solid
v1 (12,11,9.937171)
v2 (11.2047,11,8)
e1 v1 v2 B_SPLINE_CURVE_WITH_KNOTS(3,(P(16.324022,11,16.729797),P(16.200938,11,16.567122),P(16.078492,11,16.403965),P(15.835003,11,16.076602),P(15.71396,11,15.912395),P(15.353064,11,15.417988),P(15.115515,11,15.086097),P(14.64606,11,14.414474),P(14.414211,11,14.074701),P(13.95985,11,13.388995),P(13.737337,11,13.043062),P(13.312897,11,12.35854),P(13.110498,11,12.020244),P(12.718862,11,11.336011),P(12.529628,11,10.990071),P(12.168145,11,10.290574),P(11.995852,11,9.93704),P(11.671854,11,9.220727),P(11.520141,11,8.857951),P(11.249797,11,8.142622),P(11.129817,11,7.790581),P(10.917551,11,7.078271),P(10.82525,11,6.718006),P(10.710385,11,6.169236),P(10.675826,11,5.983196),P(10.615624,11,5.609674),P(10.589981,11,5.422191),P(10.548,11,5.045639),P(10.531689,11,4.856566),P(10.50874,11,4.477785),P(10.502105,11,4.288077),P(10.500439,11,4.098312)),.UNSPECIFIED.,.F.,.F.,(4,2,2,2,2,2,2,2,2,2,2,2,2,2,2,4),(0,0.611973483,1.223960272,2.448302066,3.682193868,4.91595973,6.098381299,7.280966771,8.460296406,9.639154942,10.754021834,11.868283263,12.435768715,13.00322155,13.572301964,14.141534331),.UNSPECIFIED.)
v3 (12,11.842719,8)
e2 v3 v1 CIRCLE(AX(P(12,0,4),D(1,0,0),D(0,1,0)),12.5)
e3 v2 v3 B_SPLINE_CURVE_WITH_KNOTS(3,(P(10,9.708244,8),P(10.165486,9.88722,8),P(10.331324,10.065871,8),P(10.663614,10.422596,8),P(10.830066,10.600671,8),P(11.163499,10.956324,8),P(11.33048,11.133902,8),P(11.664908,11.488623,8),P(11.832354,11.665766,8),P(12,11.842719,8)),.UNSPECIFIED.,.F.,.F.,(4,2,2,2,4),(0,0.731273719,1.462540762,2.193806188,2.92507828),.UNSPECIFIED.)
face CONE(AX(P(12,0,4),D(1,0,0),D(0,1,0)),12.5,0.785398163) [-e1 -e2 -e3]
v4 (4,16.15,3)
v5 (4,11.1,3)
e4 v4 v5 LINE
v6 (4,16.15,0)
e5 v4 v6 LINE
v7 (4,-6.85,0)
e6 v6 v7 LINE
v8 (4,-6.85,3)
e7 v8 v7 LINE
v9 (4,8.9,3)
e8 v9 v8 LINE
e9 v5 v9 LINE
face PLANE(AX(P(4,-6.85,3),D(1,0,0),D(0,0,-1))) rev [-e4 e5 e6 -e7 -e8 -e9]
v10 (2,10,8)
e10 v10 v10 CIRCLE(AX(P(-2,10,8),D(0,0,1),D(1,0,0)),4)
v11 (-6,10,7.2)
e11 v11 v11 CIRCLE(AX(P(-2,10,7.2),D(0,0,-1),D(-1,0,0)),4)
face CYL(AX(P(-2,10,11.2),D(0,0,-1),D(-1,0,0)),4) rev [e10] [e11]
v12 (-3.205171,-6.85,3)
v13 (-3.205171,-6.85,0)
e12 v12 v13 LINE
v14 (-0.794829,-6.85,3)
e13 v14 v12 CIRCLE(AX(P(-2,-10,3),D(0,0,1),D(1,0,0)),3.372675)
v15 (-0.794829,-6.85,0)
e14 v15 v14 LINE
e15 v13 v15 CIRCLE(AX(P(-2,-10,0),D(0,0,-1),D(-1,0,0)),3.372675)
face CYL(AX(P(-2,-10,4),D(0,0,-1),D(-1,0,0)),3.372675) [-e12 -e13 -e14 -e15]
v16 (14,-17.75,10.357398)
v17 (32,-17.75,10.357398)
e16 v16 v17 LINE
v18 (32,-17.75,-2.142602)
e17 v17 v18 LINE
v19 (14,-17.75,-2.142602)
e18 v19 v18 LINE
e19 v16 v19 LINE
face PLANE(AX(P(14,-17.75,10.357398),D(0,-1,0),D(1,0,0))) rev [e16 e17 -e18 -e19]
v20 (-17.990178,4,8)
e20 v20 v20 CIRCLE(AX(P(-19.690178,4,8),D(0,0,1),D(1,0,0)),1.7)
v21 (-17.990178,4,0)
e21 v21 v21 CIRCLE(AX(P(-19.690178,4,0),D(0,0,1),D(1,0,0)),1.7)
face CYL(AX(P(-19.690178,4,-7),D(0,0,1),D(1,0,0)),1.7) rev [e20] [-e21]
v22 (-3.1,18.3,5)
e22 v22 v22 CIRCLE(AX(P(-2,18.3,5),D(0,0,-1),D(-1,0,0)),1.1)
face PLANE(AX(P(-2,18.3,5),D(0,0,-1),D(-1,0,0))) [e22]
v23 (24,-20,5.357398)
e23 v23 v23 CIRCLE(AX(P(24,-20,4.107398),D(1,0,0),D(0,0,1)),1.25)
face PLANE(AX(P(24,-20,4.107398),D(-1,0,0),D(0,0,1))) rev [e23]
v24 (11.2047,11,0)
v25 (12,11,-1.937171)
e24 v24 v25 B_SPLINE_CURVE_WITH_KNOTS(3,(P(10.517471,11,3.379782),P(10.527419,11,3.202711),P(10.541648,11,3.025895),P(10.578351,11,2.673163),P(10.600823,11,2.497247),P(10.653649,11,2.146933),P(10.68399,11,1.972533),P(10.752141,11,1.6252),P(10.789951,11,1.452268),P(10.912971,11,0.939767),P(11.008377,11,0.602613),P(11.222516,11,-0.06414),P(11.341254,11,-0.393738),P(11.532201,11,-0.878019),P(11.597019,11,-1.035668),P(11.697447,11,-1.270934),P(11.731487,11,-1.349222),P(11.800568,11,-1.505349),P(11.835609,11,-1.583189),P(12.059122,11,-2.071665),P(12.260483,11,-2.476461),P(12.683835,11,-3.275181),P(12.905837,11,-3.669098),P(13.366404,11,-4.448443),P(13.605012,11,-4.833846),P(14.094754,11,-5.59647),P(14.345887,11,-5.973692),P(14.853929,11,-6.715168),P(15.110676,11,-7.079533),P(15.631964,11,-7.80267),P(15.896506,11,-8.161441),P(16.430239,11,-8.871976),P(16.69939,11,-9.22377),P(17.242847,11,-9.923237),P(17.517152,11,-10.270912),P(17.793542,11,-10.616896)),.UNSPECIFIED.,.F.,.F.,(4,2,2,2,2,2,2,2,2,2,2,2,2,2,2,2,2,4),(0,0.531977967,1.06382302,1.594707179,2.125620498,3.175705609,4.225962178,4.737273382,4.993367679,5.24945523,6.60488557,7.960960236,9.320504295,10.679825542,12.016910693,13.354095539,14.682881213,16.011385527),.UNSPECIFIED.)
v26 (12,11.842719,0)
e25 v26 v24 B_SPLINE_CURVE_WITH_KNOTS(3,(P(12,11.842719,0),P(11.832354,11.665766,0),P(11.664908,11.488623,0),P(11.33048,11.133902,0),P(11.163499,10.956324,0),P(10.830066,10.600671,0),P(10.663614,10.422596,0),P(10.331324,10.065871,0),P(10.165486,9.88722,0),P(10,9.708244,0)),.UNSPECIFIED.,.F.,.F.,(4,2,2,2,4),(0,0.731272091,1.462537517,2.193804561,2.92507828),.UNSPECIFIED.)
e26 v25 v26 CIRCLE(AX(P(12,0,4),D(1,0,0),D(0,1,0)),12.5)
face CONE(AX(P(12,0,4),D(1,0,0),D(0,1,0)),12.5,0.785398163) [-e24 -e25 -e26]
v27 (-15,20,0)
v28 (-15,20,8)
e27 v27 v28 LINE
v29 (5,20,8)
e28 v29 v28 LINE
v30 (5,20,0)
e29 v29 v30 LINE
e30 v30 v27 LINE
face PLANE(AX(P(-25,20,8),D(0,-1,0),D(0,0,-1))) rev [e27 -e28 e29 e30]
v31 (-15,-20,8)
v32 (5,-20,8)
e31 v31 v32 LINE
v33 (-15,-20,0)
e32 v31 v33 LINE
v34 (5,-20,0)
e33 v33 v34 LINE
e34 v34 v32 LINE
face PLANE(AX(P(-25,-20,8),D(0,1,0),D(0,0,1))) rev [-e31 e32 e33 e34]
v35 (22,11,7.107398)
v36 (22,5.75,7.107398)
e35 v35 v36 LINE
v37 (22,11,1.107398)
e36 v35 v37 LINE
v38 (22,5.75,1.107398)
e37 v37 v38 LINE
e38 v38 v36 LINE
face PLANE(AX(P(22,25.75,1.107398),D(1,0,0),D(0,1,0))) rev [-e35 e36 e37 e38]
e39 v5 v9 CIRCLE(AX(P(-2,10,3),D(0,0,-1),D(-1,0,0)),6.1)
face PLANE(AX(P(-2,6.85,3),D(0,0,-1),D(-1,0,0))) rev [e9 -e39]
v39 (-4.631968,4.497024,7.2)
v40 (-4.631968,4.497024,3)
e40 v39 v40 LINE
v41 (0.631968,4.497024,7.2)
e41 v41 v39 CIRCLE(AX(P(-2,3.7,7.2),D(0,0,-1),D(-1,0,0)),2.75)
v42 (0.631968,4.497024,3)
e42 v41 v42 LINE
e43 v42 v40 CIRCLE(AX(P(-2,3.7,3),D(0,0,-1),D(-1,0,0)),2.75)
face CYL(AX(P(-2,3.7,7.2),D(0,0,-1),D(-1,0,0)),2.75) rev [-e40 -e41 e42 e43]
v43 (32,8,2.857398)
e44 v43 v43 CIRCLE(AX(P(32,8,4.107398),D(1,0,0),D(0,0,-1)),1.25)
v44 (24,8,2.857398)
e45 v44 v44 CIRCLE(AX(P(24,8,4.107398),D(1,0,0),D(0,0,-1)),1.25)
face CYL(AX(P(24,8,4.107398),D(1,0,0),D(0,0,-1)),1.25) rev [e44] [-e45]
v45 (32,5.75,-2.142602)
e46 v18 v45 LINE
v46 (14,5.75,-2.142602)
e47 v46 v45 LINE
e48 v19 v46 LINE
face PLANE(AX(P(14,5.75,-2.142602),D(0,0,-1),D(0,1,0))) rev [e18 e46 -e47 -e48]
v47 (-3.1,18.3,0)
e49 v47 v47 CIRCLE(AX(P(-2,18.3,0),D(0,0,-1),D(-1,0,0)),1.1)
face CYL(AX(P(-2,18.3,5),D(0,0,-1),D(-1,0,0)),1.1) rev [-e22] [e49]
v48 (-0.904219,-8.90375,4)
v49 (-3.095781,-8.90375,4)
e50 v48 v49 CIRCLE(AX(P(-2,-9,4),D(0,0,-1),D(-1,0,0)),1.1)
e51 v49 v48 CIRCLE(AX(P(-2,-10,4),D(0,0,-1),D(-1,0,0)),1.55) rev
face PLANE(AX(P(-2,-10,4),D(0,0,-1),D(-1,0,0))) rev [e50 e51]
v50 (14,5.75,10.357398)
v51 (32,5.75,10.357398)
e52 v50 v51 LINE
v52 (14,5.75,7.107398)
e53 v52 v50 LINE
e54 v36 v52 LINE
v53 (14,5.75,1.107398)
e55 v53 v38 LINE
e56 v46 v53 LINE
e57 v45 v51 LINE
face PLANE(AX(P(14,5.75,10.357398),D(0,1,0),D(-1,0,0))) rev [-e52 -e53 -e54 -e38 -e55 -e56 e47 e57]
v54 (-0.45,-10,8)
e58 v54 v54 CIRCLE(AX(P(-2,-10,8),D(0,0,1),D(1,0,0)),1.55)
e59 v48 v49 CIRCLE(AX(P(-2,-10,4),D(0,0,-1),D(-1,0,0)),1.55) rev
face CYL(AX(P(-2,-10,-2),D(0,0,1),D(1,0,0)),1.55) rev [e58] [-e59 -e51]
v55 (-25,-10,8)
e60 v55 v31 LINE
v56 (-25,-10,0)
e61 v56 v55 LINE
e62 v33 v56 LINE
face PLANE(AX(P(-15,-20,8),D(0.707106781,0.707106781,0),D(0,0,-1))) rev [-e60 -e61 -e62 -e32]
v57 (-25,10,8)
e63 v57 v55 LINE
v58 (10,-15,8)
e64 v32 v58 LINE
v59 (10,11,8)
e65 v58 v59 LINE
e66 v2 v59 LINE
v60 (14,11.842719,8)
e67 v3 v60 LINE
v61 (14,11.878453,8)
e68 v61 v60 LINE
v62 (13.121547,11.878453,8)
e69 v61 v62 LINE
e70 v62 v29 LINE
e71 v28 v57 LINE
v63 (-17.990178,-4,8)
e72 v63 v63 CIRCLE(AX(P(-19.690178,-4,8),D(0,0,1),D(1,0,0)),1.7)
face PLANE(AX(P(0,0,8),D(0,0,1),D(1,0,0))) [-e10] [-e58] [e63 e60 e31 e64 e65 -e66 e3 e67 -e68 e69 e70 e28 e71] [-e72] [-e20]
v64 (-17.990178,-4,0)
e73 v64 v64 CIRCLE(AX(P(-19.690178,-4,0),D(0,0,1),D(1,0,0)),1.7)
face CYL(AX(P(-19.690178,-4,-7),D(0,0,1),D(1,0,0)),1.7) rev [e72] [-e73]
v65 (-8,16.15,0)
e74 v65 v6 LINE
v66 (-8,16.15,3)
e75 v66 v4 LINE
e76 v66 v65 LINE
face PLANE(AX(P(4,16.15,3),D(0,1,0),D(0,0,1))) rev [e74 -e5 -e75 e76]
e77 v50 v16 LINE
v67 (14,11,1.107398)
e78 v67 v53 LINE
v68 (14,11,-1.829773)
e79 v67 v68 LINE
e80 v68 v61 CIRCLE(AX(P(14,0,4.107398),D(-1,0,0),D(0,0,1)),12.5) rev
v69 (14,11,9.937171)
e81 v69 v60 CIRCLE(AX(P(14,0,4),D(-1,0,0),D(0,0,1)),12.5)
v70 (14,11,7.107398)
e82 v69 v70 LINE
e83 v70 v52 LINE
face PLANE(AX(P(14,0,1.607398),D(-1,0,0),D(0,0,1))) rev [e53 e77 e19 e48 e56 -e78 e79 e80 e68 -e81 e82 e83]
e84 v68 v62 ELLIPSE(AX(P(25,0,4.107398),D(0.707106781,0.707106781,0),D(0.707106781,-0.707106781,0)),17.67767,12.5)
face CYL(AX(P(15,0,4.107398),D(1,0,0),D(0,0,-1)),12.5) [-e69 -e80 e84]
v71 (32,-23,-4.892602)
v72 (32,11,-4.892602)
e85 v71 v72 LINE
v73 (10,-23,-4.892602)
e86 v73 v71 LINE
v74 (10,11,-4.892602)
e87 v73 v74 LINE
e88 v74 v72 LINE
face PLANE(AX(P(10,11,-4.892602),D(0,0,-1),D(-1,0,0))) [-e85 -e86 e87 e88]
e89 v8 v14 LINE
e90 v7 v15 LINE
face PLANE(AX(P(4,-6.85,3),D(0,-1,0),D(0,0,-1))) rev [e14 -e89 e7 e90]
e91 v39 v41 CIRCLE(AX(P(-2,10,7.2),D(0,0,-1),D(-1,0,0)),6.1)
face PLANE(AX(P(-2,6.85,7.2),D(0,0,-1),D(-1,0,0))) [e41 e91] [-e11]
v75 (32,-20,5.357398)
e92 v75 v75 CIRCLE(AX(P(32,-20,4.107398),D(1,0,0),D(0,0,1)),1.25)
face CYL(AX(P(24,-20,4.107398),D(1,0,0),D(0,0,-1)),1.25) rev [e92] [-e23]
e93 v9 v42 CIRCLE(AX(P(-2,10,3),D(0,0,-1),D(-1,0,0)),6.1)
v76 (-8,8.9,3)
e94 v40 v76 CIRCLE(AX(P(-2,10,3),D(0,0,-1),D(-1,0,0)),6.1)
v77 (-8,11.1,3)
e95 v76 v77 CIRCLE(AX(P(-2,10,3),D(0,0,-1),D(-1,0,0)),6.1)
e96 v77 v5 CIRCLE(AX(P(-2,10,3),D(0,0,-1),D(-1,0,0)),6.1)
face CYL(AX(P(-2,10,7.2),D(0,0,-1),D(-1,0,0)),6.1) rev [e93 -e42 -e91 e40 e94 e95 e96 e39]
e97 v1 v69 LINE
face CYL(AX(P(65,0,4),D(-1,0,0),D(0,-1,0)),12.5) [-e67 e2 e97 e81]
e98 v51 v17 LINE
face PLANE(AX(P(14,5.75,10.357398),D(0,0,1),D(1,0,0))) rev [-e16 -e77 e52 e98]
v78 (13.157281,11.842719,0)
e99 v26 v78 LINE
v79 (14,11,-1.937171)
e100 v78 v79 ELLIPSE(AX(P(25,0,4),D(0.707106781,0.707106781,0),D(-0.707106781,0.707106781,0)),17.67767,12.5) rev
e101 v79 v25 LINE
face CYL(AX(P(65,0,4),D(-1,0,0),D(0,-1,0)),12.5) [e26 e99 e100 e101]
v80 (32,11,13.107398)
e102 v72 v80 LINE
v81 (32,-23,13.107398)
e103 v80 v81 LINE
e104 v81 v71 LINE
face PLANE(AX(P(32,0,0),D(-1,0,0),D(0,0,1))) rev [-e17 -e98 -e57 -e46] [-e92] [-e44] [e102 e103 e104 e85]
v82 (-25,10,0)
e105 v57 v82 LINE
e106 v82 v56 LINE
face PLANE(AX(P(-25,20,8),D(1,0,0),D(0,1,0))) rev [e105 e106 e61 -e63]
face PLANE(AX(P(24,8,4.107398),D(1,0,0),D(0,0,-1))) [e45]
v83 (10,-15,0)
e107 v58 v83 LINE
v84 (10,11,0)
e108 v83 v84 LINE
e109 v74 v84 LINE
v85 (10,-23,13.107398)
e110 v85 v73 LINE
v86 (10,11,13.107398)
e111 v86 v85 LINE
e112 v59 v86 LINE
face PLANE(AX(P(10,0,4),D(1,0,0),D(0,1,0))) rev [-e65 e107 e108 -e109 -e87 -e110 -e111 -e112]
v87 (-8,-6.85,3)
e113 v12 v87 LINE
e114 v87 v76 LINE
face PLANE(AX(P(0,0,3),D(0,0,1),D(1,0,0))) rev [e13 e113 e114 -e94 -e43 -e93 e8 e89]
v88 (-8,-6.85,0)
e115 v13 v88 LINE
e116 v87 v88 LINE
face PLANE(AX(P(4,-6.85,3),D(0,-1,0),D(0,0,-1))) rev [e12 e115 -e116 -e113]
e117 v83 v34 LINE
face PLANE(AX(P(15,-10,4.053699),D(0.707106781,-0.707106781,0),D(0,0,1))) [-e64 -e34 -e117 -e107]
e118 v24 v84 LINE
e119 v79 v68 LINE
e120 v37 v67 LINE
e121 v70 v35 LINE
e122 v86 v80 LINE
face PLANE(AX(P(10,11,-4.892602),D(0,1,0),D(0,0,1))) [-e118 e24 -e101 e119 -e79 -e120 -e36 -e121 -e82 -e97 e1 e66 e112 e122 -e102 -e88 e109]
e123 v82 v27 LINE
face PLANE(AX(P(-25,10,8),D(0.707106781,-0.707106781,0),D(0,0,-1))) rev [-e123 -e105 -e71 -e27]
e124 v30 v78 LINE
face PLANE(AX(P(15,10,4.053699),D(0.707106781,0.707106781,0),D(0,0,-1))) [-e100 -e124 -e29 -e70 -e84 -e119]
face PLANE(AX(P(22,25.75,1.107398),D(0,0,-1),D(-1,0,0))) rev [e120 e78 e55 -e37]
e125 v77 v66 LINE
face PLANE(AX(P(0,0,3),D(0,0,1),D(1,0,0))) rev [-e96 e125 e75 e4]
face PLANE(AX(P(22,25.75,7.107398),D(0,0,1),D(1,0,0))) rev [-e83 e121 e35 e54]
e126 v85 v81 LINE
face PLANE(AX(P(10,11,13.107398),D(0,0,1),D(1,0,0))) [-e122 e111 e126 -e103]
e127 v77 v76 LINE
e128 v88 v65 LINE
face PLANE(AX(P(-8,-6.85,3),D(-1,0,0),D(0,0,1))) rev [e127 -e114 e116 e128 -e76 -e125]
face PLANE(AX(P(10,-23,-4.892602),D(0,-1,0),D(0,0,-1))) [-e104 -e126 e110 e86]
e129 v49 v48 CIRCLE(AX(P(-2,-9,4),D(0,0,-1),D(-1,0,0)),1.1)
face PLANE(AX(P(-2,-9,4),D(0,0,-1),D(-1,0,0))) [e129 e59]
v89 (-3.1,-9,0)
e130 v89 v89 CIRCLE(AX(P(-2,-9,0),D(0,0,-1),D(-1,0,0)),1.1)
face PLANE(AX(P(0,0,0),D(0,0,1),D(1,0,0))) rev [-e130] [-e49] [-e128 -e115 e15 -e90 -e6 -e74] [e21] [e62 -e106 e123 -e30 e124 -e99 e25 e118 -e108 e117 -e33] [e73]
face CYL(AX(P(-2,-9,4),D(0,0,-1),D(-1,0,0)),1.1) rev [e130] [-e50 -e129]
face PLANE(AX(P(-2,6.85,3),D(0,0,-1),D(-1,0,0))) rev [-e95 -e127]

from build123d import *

# Parameters (mm, degrees)
SKETCH_1_W                = 50
SKETCH_1_H                = 40
EXTRUDE_1_DEPTH           = 8
CHAMFER_1_SIZE            = 10
SKETCH_2_R                = 1.55
CUT_EXTRUDE_1_DEPTH       = 10
EXTRUDE_2_DEPTH           = 40
EXTRUDE_2_DEPTH_BACK      = 15
SKETCH_3_R                = 12.5
SKETCH_4_R                = 1.7
CUT_EXTRUDE_2_DEPTH       = 15
CUT_EXTRUDE_START         = -20
CUT_EXTRUDE_3_DEPTH       = 20
SKETCH_7_R                = 16.5
CUT_EXTRUDE_8_DEPTH       = 33
CUT_EXTRUDE_9_DEPTH       = 20
CHAMFER_3_SIZE            = 2
SKETCH_10_OUTSIDE_W       = 47.322
SKETCH_10_OUTSIDE_H       = 62.322
SKETCH_10_OUTSIDE_R       = 12.5
CUT_EXTRUDE_10_DEPTH      = 10
CHAMFER_4_SIZE            = 10
SKETCH_12_W               = 1.5
SKETCH_12_H               = 20
SKETCH_14_W               = 12
SKETCH_14_H               = 23
CUT_EXTRUDE_11_DEPTH      = 3
CUT_EXTRUDE_12_DEPTH      = 4.2
SKETCH_16_R               = 1.1
CUT_EXTRUDE_13_DEPTH      = 5
SKETCH_17_R               = 3.372674955
EXTRUDE_3_DEPTH           = 4
SKETCH_18_R               = 1.1
CUT_EXTRUDE_14_DEPTH      = 4
SKETCH_20_R               = 4
CUT_EXTRUDE_15_DEPTH      = 4
CUT_EXTRUDE_16_DEPTH      = 70.980354503
CUT_EXTRUDE_16_DEPTH_BACK = 70.980354503
SKETCH_21_W               = 56.3061188
SKETCH_21_H               = 46.683670243
EXTRUDE_4_DEPTH           = 18
EXTRUDE_4_DEPTH_BACK      = 4
SKETCH_22_W               = 18
SKETCH_22_H               = 34
SKETCH_23_W               = 12.5
SKETCH_23_H               = 23.5
CUT_EXTRUDE_17_DEPTH      = 18
SKETCH_24_R               = 1.25
CUT_EXTRUDE_18_DEPTH      = 8
CUT_EXTRUDE_19_DEPTH      = 64.641574462
SKETCH_26_W               = 8
SKETCH_26_H               = 6
CUT_EXTRUDE_20_DEPTH      = 20


# Read off the part's stored shape, not the designer's step: 切除-拉伸3
with BuildPart() as part:
    # 草图1 → 凸台-拉伸1 (new body)
    with BuildSketch(Plane.XY):
        Rectangle(SKETCH_1_W, SKETCH_1_H)
    extrude(amount=EXTRUDE_1_DEPTH)

    # 倒角1
    chamfer_1_edges = [part.edges().sort_by_distance(p)[0] for p in [
        (-25, -20, 4),
        (-25, 20, 4),
    ]]
    chamfer(chamfer_1_edges, length=CHAMFER_1_SIZE)

    # 草图2 → 切除-拉伸1 (cut)
    with BuildSketch(Plane.XY.offset(8)):
        with Locations((-2, -10)):
            Circle(SKETCH_2_R)
        with Locations((-2, 10)):
            Circle(SKETCH_2_R)
    extrude(amount=-CUT_EXTRUDE_1_DEPTH, mode=Mode.SUBTRACT)

    # 草图3 → 凸台-拉伸2 (add, two sides: drawn at the far end of the back side and taken through both)
    with BuildSketch(Plane(origin=(25, 0, 0), x_dir=(0, 0, -1), z_dir=(1, 0, 0)).offset(-EXTRUDE_2_DEPTH_BACK)):
        with Locations(Location((-4, 0, 0), (0, 0, 251.337075115))):
            Circle(SKETCH_3_R)
    extrude(amount=EXTRUDE_2_DEPTH + EXTRUDE_2_DEPTH_BACK)

    # 草图4 → 切除-拉伸2 (cut)
    with BuildSketch(Plane.XY.offset(8)):
        with Locations((-19.690178066, -4)):
            Circle(SKETCH_4_R)
        with Locations((-19.690178066, 4)):
            Circle(SKETCH_4_R)
    extrude(amount=-CUT_EXTRUDE_2_DEPTH, mode=Mode.SUBTRACT)

    # 切除-拉伸3 outline → 切除-拉伸3 (cut)
    with BuildSketch(Plane(origin=(65, 0, 0), x_dir=(0, 0, -1), z_dir=(1, 0, 0)).offset(CUT_EXTRUDE_START)):
        with BuildLine():
            Line((7.456439237, -5), (-15.456439237, -5))
            ThreePointArc((-15.456439237, -5), (-4, -12.5), (7.456439237, -5))
        make_face()
        with BuildLine():
            ThreePointArc((7.456439237, 5), (-4, 12.5), (-15.456439237, 5))
            Line((-15.456439237, 5), (7.456439237, 5))
        make_face()
    extrude(amount=CUT_EXTRUDE_3_DEPTH, mode=Mode.SUBTRACT)

    # 草图7 → 切除-拉伸8 (cut)
    with BuildSketch(Plane.XZ.offset(5)):
        with Locations((48.5, 4)):
            Circle(SKETCH_7_R)
    cut_extrude_8 = extrude(amount=CUT_EXTRUDE_8_DEPTH, mode=Mode.SUBTRACT)

    # 镜向1: 切除-拉伸8 across plane
    add(cut_extrude_8.mirror(Plane.ZX), mode=Mode.SUBTRACT)

    # 草图8 → 切除-拉伸9 (cut)
    with BuildSketch(Plane.XZ.offset(5)):
        with BuildLine():
            Line((50, 19.107397707), (75.764252489, 33.62580965))
            Line((75.764252489, 33.62580965), (78.826270749, -18.347337912))
            Line((78.826270749, -18.347337912), (50, -10.892602293))
            ThreePointArc((50, -10.892602293), (65, 4.107397707), (50, 19.107397707))
        make_face()
    extrude(amount=-CUT_EXTRUDE_9_DEPTH, mode=Mode.SUBTRACT)

    # 倒角3
    chamfer_3_edges = [part.edges().sort_by_distance(p)[0] for p in [
        (10, 0, 16.5),
        (10, 0, -8.5),
    ]]
    chamfer(chamfer_3_edges, length=CHAMFER_3_SIZE)

    # 草图10 outside → 切除-拉伸10 (cut)
    with BuildSketch(Plane(origin=(25, 0, 0), x_dir=(0, 0, -1), z_dir=(1, 0, 0))):
        with Locations((-4, 0)):
            Rectangle(SKETCH_10_OUTSIDE_W, SKETCH_10_OUTSIDE_H)
        with Locations((-4.107397707, 0)):
            Circle(SKETCH_10_OUTSIDE_R, mode=Mode.SUBTRACT)
    extrude(amount=-CUT_EXTRUDE_10_DEPTH, mode=Mode.SUBTRACT)

    # 倒角4
    # the kernel refuses this chamfer: 10 mm, written as the material it takes off along each edge
    with BuildSketch(Plane(origin=(15, -20, -25.71682988), x_dir=(-0.9996219169112968, -0.027495876610586317, 0), z_dir=(0, 0, 1))) as chamfer_4_piece_1_section:
        Polygon((CHAMFER_4_SIZE * 0.999621916911, -CHAMFER_4_SIZE * 0.0274958766106), (-CHAMFER_4_SIZE * 0.0274958766106, -CHAMFER_4_SIZE * 0.999621916911), (0, 0), align=None)
    chamfer_4_piece_1 = extrude(amount=59.433659759, mode=Mode.PRIVATE)
    chamfer_4_piece_1 = chamfer_4_piece_1 - Plane(origin=(11.669205873, 0, 4.107397707), x_dir=(0, 0, -1), z_dir=(1, 0, 0)) * Cylinder(12.5, 159, mode=Mode.PRIVATE)
    add(chamfer_4_piece_1, mode=Mode.SUBTRACT)
    with BuildSketch(Plane(origin=(15, 20, 33.71682988), x_dir=(-0.9996219169112968, 0.027495876610586317, 0), z_dir=(0, 0, -1))) as chamfer_4_piece_2_section:
        Polygon((CHAMFER_4_SIZE * 0.999621916911, -CHAMFER_4_SIZE * 0.0274958766106), (-CHAMFER_4_SIZE * 0.0274958766106, -CHAMFER_4_SIZE * 0.999621916911), (0, 0), align=None)
    chamfer_4_piece_2 = extrude(amount=59.433659759, mode=Mode.PRIVATE)
    chamfer_4_piece_2 = chamfer_4_piece_2 - Plane(origin=(11.669205873, 0, 4.107397707), x_dir=(0, 0, -1), z_dir=(1, 0, 0)) * Cylinder(12.5, 159, mode=Mode.PRIVATE)
    add(chamfer_4_piece_2, mode=Mode.SUBTRACT)

    # 草图12 → 切除-旋转2 (revolve, cut)
    with BuildSketch(Plane(origin=(0, 0, 0), x_dir=(1, 0, 0), z_dir=(0, 1, 0))):
        with Locations((14.75, 8.392602293)):
            Rectangle(SKETCH_12_W, SKETCH_12_H)
    revolve(axis=Axis((50, 0, 4.107397707), (-1, 0, 0)), mode=Mode.SUBTRACT)

    # 草图14 → 切除-拉伸11 (cut)
    with BuildSketch(Plane(origin=(0, 0, 0), x_dir=(-1, 0, 0), z_dir=(0, 0, -1))):
        with Locations((2, 4.65)):
            Rectangle(SKETCH_14_W, SKETCH_14_H)
    extrude(amount=-CUT_EXTRUDE_11_DEPTH, mode=Mode.SUBTRACT)

    # 草图15 → 切除-拉伸12 (cut)
    with BuildSketch(Plane(origin=(0, 0, 3), x_dir=(-1, 0, 0), z_dir=(0, 0, -1))):
        with BuildLine():
            ThreePointArc((4.631967524, 4.49702381), (2, 16.1), (-0.631967524, 4.49702381))
            ThreePointArc((-0.631967524, 4.49702381), (2, 0.95), (4.631967524, 4.49702381))
        make_face()
    extrude(amount=-CUT_EXTRUDE_12_DEPTH, mode=Mode.SUBTRACT)

    # 草图16 → 切除-拉伸13 (cut)
    with BuildSketch(Plane(origin=(0, 0, 0), x_dir=(-1, 0, 0), z_dir=(0, 0, -1))):
        with Locations((2, 18.3)):
            Circle(SKETCH_16_R)
    extrude(amount=-CUT_EXTRUDE_13_DEPTH, mode=Mode.SUBTRACT)

    # 草图17 → 凸台-拉伸3 (add)
    with BuildSketch(Plane(origin=(0, 0, 0), x_dir=(-1, 0, 0), z_dir=(0, 0, -1))):
        with Locations((2, -10)):
            Circle(SKETCH_17_R)
    extrude(amount=-EXTRUDE_3_DEPTH)

    # 草图18 → 切除-拉伸14 (cut)
    with BuildSketch(Plane(origin=(0, 0, 0), x_dir=(-1, 0, 0), z_dir=(0, 0, -1))):
        with Locations((2, -9)):
            Circle(SKETCH_18_R)
    extrude(amount=-CUT_EXTRUDE_14_DEPTH, mode=Mode.SUBTRACT)

    # 草图20 → 切除-拉伸15 (cut)
    with BuildSketch(Plane(origin=(0, 0, 7.2), x_dir=(-1, 0, 0), z_dir=(0, 0, -1))):
        with Locations((2, 10)):
            Circle(SKETCH_20_R)
    extrude(amount=-CUT_EXTRUDE_15_DEPTH, mode=Mode.SUBTRACT)

    # 草图21 → 切除-拉伸16 (cut, two sides: drawn at the far end of the back side and taken through both)
    with BuildSketch(Plane(origin=(0, 0, 0), x_dir=(-1, 0, 0), z_dir=(0, 0, -1)).offset(-CUT_EXTRUDE_16_DEPTH_BACK)):
        with Locations((-42.1530594, 7.959183123)):
            Rectangle(SKETCH_21_W, SKETCH_21_H)
    extrude(amount=CUT_EXTRUDE_16_DEPTH + CUT_EXTRUDE_16_DEPTH_BACK, mode=Mode.SUBTRACT)

    # 草图22 → 凸台-拉伸4 (add, two sides: drawn at the far end of the back side and taken through both)
    with BuildSketch(Plane(origin=(14, 0, 0), x_dir=(0, 0, -1), z_dir=(1, 0, 0)).offset(-EXTRUDE_4_DEPTH_BACK)):
        with Locations((-4.107397707, -6)):
            Rectangle(SKETCH_22_W, SKETCH_22_H)
    extrude(amount=EXTRUDE_4_DEPTH + EXTRUDE_4_DEPTH_BACK)

    # 草图23 → 切除-拉伸17 (cut)
    with BuildSketch(Plane(origin=(32, 0, 0), x_dir=(0, 0, -1), z_dir=(1, 0, 0))):
        with Locations((-4.107397707, -6)):
            Rectangle(SKETCH_23_W, SKETCH_23_H)
    extrude(amount=-CUT_EXTRUDE_17_DEPTH, mode=Mode.SUBTRACT)

    # 草图24 → 切除-拉伸18 (cut)
    with BuildSketch(Plane(origin=(32, 0, 0), x_dir=(0, 0, -1), z_dir=(1, 0, 0))):
        with Locations((-4.107397707, 8)):
            Circle(SKETCH_24_R)
        with Locations(Location((-4.107397707, -20, 0), (0, 0, 180))):
            Circle(SKETCH_24_R)
    extrude(amount=-CUT_EXTRUDE_18_DEPTH, mode=Mode.SUBTRACT)

    # 草图25 → 切除-拉伸19 (cut, through all)
    with BuildSketch(Plane(origin=(32, 0, 0), x_dir=(0, 0, -1), z_dir=(1, 0, 0))):
        with BuildLine():
            Line((-13.107397707, -8.561851845), (-13.107397707, 8.561851845))
            ThreePointArc((-13.107397707, 8.561851845), (-16.5, 0), (-13.107397707, -8.561851845))
        make_face()
        with BuildLine():
            Line((4.892602293, -8.784738155), (4.892602293, 8.784738155))
            ThreePointArc((4.892602293, 8.784738155), (8.5, 0), (4.892602293, -8.784738155))
        make_face()
    extrude(amount=-CUT_EXTRUDE_19_DEPTH, mode=Mode.SUBTRACT)

    # 草图26 → 切除-拉伸20 (cut)
    with BuildSketch(Plane.XZ.offset(-5.75)):
        with Locations((18, 4.107397707)):
            Rectangle(SKETCH_26_W, SKETCH_26_H)
    extrude(amount=-CUT_EXTRUDE_20_DEPTH, mode=Mode.SUBTRACT)


solid = part.part
